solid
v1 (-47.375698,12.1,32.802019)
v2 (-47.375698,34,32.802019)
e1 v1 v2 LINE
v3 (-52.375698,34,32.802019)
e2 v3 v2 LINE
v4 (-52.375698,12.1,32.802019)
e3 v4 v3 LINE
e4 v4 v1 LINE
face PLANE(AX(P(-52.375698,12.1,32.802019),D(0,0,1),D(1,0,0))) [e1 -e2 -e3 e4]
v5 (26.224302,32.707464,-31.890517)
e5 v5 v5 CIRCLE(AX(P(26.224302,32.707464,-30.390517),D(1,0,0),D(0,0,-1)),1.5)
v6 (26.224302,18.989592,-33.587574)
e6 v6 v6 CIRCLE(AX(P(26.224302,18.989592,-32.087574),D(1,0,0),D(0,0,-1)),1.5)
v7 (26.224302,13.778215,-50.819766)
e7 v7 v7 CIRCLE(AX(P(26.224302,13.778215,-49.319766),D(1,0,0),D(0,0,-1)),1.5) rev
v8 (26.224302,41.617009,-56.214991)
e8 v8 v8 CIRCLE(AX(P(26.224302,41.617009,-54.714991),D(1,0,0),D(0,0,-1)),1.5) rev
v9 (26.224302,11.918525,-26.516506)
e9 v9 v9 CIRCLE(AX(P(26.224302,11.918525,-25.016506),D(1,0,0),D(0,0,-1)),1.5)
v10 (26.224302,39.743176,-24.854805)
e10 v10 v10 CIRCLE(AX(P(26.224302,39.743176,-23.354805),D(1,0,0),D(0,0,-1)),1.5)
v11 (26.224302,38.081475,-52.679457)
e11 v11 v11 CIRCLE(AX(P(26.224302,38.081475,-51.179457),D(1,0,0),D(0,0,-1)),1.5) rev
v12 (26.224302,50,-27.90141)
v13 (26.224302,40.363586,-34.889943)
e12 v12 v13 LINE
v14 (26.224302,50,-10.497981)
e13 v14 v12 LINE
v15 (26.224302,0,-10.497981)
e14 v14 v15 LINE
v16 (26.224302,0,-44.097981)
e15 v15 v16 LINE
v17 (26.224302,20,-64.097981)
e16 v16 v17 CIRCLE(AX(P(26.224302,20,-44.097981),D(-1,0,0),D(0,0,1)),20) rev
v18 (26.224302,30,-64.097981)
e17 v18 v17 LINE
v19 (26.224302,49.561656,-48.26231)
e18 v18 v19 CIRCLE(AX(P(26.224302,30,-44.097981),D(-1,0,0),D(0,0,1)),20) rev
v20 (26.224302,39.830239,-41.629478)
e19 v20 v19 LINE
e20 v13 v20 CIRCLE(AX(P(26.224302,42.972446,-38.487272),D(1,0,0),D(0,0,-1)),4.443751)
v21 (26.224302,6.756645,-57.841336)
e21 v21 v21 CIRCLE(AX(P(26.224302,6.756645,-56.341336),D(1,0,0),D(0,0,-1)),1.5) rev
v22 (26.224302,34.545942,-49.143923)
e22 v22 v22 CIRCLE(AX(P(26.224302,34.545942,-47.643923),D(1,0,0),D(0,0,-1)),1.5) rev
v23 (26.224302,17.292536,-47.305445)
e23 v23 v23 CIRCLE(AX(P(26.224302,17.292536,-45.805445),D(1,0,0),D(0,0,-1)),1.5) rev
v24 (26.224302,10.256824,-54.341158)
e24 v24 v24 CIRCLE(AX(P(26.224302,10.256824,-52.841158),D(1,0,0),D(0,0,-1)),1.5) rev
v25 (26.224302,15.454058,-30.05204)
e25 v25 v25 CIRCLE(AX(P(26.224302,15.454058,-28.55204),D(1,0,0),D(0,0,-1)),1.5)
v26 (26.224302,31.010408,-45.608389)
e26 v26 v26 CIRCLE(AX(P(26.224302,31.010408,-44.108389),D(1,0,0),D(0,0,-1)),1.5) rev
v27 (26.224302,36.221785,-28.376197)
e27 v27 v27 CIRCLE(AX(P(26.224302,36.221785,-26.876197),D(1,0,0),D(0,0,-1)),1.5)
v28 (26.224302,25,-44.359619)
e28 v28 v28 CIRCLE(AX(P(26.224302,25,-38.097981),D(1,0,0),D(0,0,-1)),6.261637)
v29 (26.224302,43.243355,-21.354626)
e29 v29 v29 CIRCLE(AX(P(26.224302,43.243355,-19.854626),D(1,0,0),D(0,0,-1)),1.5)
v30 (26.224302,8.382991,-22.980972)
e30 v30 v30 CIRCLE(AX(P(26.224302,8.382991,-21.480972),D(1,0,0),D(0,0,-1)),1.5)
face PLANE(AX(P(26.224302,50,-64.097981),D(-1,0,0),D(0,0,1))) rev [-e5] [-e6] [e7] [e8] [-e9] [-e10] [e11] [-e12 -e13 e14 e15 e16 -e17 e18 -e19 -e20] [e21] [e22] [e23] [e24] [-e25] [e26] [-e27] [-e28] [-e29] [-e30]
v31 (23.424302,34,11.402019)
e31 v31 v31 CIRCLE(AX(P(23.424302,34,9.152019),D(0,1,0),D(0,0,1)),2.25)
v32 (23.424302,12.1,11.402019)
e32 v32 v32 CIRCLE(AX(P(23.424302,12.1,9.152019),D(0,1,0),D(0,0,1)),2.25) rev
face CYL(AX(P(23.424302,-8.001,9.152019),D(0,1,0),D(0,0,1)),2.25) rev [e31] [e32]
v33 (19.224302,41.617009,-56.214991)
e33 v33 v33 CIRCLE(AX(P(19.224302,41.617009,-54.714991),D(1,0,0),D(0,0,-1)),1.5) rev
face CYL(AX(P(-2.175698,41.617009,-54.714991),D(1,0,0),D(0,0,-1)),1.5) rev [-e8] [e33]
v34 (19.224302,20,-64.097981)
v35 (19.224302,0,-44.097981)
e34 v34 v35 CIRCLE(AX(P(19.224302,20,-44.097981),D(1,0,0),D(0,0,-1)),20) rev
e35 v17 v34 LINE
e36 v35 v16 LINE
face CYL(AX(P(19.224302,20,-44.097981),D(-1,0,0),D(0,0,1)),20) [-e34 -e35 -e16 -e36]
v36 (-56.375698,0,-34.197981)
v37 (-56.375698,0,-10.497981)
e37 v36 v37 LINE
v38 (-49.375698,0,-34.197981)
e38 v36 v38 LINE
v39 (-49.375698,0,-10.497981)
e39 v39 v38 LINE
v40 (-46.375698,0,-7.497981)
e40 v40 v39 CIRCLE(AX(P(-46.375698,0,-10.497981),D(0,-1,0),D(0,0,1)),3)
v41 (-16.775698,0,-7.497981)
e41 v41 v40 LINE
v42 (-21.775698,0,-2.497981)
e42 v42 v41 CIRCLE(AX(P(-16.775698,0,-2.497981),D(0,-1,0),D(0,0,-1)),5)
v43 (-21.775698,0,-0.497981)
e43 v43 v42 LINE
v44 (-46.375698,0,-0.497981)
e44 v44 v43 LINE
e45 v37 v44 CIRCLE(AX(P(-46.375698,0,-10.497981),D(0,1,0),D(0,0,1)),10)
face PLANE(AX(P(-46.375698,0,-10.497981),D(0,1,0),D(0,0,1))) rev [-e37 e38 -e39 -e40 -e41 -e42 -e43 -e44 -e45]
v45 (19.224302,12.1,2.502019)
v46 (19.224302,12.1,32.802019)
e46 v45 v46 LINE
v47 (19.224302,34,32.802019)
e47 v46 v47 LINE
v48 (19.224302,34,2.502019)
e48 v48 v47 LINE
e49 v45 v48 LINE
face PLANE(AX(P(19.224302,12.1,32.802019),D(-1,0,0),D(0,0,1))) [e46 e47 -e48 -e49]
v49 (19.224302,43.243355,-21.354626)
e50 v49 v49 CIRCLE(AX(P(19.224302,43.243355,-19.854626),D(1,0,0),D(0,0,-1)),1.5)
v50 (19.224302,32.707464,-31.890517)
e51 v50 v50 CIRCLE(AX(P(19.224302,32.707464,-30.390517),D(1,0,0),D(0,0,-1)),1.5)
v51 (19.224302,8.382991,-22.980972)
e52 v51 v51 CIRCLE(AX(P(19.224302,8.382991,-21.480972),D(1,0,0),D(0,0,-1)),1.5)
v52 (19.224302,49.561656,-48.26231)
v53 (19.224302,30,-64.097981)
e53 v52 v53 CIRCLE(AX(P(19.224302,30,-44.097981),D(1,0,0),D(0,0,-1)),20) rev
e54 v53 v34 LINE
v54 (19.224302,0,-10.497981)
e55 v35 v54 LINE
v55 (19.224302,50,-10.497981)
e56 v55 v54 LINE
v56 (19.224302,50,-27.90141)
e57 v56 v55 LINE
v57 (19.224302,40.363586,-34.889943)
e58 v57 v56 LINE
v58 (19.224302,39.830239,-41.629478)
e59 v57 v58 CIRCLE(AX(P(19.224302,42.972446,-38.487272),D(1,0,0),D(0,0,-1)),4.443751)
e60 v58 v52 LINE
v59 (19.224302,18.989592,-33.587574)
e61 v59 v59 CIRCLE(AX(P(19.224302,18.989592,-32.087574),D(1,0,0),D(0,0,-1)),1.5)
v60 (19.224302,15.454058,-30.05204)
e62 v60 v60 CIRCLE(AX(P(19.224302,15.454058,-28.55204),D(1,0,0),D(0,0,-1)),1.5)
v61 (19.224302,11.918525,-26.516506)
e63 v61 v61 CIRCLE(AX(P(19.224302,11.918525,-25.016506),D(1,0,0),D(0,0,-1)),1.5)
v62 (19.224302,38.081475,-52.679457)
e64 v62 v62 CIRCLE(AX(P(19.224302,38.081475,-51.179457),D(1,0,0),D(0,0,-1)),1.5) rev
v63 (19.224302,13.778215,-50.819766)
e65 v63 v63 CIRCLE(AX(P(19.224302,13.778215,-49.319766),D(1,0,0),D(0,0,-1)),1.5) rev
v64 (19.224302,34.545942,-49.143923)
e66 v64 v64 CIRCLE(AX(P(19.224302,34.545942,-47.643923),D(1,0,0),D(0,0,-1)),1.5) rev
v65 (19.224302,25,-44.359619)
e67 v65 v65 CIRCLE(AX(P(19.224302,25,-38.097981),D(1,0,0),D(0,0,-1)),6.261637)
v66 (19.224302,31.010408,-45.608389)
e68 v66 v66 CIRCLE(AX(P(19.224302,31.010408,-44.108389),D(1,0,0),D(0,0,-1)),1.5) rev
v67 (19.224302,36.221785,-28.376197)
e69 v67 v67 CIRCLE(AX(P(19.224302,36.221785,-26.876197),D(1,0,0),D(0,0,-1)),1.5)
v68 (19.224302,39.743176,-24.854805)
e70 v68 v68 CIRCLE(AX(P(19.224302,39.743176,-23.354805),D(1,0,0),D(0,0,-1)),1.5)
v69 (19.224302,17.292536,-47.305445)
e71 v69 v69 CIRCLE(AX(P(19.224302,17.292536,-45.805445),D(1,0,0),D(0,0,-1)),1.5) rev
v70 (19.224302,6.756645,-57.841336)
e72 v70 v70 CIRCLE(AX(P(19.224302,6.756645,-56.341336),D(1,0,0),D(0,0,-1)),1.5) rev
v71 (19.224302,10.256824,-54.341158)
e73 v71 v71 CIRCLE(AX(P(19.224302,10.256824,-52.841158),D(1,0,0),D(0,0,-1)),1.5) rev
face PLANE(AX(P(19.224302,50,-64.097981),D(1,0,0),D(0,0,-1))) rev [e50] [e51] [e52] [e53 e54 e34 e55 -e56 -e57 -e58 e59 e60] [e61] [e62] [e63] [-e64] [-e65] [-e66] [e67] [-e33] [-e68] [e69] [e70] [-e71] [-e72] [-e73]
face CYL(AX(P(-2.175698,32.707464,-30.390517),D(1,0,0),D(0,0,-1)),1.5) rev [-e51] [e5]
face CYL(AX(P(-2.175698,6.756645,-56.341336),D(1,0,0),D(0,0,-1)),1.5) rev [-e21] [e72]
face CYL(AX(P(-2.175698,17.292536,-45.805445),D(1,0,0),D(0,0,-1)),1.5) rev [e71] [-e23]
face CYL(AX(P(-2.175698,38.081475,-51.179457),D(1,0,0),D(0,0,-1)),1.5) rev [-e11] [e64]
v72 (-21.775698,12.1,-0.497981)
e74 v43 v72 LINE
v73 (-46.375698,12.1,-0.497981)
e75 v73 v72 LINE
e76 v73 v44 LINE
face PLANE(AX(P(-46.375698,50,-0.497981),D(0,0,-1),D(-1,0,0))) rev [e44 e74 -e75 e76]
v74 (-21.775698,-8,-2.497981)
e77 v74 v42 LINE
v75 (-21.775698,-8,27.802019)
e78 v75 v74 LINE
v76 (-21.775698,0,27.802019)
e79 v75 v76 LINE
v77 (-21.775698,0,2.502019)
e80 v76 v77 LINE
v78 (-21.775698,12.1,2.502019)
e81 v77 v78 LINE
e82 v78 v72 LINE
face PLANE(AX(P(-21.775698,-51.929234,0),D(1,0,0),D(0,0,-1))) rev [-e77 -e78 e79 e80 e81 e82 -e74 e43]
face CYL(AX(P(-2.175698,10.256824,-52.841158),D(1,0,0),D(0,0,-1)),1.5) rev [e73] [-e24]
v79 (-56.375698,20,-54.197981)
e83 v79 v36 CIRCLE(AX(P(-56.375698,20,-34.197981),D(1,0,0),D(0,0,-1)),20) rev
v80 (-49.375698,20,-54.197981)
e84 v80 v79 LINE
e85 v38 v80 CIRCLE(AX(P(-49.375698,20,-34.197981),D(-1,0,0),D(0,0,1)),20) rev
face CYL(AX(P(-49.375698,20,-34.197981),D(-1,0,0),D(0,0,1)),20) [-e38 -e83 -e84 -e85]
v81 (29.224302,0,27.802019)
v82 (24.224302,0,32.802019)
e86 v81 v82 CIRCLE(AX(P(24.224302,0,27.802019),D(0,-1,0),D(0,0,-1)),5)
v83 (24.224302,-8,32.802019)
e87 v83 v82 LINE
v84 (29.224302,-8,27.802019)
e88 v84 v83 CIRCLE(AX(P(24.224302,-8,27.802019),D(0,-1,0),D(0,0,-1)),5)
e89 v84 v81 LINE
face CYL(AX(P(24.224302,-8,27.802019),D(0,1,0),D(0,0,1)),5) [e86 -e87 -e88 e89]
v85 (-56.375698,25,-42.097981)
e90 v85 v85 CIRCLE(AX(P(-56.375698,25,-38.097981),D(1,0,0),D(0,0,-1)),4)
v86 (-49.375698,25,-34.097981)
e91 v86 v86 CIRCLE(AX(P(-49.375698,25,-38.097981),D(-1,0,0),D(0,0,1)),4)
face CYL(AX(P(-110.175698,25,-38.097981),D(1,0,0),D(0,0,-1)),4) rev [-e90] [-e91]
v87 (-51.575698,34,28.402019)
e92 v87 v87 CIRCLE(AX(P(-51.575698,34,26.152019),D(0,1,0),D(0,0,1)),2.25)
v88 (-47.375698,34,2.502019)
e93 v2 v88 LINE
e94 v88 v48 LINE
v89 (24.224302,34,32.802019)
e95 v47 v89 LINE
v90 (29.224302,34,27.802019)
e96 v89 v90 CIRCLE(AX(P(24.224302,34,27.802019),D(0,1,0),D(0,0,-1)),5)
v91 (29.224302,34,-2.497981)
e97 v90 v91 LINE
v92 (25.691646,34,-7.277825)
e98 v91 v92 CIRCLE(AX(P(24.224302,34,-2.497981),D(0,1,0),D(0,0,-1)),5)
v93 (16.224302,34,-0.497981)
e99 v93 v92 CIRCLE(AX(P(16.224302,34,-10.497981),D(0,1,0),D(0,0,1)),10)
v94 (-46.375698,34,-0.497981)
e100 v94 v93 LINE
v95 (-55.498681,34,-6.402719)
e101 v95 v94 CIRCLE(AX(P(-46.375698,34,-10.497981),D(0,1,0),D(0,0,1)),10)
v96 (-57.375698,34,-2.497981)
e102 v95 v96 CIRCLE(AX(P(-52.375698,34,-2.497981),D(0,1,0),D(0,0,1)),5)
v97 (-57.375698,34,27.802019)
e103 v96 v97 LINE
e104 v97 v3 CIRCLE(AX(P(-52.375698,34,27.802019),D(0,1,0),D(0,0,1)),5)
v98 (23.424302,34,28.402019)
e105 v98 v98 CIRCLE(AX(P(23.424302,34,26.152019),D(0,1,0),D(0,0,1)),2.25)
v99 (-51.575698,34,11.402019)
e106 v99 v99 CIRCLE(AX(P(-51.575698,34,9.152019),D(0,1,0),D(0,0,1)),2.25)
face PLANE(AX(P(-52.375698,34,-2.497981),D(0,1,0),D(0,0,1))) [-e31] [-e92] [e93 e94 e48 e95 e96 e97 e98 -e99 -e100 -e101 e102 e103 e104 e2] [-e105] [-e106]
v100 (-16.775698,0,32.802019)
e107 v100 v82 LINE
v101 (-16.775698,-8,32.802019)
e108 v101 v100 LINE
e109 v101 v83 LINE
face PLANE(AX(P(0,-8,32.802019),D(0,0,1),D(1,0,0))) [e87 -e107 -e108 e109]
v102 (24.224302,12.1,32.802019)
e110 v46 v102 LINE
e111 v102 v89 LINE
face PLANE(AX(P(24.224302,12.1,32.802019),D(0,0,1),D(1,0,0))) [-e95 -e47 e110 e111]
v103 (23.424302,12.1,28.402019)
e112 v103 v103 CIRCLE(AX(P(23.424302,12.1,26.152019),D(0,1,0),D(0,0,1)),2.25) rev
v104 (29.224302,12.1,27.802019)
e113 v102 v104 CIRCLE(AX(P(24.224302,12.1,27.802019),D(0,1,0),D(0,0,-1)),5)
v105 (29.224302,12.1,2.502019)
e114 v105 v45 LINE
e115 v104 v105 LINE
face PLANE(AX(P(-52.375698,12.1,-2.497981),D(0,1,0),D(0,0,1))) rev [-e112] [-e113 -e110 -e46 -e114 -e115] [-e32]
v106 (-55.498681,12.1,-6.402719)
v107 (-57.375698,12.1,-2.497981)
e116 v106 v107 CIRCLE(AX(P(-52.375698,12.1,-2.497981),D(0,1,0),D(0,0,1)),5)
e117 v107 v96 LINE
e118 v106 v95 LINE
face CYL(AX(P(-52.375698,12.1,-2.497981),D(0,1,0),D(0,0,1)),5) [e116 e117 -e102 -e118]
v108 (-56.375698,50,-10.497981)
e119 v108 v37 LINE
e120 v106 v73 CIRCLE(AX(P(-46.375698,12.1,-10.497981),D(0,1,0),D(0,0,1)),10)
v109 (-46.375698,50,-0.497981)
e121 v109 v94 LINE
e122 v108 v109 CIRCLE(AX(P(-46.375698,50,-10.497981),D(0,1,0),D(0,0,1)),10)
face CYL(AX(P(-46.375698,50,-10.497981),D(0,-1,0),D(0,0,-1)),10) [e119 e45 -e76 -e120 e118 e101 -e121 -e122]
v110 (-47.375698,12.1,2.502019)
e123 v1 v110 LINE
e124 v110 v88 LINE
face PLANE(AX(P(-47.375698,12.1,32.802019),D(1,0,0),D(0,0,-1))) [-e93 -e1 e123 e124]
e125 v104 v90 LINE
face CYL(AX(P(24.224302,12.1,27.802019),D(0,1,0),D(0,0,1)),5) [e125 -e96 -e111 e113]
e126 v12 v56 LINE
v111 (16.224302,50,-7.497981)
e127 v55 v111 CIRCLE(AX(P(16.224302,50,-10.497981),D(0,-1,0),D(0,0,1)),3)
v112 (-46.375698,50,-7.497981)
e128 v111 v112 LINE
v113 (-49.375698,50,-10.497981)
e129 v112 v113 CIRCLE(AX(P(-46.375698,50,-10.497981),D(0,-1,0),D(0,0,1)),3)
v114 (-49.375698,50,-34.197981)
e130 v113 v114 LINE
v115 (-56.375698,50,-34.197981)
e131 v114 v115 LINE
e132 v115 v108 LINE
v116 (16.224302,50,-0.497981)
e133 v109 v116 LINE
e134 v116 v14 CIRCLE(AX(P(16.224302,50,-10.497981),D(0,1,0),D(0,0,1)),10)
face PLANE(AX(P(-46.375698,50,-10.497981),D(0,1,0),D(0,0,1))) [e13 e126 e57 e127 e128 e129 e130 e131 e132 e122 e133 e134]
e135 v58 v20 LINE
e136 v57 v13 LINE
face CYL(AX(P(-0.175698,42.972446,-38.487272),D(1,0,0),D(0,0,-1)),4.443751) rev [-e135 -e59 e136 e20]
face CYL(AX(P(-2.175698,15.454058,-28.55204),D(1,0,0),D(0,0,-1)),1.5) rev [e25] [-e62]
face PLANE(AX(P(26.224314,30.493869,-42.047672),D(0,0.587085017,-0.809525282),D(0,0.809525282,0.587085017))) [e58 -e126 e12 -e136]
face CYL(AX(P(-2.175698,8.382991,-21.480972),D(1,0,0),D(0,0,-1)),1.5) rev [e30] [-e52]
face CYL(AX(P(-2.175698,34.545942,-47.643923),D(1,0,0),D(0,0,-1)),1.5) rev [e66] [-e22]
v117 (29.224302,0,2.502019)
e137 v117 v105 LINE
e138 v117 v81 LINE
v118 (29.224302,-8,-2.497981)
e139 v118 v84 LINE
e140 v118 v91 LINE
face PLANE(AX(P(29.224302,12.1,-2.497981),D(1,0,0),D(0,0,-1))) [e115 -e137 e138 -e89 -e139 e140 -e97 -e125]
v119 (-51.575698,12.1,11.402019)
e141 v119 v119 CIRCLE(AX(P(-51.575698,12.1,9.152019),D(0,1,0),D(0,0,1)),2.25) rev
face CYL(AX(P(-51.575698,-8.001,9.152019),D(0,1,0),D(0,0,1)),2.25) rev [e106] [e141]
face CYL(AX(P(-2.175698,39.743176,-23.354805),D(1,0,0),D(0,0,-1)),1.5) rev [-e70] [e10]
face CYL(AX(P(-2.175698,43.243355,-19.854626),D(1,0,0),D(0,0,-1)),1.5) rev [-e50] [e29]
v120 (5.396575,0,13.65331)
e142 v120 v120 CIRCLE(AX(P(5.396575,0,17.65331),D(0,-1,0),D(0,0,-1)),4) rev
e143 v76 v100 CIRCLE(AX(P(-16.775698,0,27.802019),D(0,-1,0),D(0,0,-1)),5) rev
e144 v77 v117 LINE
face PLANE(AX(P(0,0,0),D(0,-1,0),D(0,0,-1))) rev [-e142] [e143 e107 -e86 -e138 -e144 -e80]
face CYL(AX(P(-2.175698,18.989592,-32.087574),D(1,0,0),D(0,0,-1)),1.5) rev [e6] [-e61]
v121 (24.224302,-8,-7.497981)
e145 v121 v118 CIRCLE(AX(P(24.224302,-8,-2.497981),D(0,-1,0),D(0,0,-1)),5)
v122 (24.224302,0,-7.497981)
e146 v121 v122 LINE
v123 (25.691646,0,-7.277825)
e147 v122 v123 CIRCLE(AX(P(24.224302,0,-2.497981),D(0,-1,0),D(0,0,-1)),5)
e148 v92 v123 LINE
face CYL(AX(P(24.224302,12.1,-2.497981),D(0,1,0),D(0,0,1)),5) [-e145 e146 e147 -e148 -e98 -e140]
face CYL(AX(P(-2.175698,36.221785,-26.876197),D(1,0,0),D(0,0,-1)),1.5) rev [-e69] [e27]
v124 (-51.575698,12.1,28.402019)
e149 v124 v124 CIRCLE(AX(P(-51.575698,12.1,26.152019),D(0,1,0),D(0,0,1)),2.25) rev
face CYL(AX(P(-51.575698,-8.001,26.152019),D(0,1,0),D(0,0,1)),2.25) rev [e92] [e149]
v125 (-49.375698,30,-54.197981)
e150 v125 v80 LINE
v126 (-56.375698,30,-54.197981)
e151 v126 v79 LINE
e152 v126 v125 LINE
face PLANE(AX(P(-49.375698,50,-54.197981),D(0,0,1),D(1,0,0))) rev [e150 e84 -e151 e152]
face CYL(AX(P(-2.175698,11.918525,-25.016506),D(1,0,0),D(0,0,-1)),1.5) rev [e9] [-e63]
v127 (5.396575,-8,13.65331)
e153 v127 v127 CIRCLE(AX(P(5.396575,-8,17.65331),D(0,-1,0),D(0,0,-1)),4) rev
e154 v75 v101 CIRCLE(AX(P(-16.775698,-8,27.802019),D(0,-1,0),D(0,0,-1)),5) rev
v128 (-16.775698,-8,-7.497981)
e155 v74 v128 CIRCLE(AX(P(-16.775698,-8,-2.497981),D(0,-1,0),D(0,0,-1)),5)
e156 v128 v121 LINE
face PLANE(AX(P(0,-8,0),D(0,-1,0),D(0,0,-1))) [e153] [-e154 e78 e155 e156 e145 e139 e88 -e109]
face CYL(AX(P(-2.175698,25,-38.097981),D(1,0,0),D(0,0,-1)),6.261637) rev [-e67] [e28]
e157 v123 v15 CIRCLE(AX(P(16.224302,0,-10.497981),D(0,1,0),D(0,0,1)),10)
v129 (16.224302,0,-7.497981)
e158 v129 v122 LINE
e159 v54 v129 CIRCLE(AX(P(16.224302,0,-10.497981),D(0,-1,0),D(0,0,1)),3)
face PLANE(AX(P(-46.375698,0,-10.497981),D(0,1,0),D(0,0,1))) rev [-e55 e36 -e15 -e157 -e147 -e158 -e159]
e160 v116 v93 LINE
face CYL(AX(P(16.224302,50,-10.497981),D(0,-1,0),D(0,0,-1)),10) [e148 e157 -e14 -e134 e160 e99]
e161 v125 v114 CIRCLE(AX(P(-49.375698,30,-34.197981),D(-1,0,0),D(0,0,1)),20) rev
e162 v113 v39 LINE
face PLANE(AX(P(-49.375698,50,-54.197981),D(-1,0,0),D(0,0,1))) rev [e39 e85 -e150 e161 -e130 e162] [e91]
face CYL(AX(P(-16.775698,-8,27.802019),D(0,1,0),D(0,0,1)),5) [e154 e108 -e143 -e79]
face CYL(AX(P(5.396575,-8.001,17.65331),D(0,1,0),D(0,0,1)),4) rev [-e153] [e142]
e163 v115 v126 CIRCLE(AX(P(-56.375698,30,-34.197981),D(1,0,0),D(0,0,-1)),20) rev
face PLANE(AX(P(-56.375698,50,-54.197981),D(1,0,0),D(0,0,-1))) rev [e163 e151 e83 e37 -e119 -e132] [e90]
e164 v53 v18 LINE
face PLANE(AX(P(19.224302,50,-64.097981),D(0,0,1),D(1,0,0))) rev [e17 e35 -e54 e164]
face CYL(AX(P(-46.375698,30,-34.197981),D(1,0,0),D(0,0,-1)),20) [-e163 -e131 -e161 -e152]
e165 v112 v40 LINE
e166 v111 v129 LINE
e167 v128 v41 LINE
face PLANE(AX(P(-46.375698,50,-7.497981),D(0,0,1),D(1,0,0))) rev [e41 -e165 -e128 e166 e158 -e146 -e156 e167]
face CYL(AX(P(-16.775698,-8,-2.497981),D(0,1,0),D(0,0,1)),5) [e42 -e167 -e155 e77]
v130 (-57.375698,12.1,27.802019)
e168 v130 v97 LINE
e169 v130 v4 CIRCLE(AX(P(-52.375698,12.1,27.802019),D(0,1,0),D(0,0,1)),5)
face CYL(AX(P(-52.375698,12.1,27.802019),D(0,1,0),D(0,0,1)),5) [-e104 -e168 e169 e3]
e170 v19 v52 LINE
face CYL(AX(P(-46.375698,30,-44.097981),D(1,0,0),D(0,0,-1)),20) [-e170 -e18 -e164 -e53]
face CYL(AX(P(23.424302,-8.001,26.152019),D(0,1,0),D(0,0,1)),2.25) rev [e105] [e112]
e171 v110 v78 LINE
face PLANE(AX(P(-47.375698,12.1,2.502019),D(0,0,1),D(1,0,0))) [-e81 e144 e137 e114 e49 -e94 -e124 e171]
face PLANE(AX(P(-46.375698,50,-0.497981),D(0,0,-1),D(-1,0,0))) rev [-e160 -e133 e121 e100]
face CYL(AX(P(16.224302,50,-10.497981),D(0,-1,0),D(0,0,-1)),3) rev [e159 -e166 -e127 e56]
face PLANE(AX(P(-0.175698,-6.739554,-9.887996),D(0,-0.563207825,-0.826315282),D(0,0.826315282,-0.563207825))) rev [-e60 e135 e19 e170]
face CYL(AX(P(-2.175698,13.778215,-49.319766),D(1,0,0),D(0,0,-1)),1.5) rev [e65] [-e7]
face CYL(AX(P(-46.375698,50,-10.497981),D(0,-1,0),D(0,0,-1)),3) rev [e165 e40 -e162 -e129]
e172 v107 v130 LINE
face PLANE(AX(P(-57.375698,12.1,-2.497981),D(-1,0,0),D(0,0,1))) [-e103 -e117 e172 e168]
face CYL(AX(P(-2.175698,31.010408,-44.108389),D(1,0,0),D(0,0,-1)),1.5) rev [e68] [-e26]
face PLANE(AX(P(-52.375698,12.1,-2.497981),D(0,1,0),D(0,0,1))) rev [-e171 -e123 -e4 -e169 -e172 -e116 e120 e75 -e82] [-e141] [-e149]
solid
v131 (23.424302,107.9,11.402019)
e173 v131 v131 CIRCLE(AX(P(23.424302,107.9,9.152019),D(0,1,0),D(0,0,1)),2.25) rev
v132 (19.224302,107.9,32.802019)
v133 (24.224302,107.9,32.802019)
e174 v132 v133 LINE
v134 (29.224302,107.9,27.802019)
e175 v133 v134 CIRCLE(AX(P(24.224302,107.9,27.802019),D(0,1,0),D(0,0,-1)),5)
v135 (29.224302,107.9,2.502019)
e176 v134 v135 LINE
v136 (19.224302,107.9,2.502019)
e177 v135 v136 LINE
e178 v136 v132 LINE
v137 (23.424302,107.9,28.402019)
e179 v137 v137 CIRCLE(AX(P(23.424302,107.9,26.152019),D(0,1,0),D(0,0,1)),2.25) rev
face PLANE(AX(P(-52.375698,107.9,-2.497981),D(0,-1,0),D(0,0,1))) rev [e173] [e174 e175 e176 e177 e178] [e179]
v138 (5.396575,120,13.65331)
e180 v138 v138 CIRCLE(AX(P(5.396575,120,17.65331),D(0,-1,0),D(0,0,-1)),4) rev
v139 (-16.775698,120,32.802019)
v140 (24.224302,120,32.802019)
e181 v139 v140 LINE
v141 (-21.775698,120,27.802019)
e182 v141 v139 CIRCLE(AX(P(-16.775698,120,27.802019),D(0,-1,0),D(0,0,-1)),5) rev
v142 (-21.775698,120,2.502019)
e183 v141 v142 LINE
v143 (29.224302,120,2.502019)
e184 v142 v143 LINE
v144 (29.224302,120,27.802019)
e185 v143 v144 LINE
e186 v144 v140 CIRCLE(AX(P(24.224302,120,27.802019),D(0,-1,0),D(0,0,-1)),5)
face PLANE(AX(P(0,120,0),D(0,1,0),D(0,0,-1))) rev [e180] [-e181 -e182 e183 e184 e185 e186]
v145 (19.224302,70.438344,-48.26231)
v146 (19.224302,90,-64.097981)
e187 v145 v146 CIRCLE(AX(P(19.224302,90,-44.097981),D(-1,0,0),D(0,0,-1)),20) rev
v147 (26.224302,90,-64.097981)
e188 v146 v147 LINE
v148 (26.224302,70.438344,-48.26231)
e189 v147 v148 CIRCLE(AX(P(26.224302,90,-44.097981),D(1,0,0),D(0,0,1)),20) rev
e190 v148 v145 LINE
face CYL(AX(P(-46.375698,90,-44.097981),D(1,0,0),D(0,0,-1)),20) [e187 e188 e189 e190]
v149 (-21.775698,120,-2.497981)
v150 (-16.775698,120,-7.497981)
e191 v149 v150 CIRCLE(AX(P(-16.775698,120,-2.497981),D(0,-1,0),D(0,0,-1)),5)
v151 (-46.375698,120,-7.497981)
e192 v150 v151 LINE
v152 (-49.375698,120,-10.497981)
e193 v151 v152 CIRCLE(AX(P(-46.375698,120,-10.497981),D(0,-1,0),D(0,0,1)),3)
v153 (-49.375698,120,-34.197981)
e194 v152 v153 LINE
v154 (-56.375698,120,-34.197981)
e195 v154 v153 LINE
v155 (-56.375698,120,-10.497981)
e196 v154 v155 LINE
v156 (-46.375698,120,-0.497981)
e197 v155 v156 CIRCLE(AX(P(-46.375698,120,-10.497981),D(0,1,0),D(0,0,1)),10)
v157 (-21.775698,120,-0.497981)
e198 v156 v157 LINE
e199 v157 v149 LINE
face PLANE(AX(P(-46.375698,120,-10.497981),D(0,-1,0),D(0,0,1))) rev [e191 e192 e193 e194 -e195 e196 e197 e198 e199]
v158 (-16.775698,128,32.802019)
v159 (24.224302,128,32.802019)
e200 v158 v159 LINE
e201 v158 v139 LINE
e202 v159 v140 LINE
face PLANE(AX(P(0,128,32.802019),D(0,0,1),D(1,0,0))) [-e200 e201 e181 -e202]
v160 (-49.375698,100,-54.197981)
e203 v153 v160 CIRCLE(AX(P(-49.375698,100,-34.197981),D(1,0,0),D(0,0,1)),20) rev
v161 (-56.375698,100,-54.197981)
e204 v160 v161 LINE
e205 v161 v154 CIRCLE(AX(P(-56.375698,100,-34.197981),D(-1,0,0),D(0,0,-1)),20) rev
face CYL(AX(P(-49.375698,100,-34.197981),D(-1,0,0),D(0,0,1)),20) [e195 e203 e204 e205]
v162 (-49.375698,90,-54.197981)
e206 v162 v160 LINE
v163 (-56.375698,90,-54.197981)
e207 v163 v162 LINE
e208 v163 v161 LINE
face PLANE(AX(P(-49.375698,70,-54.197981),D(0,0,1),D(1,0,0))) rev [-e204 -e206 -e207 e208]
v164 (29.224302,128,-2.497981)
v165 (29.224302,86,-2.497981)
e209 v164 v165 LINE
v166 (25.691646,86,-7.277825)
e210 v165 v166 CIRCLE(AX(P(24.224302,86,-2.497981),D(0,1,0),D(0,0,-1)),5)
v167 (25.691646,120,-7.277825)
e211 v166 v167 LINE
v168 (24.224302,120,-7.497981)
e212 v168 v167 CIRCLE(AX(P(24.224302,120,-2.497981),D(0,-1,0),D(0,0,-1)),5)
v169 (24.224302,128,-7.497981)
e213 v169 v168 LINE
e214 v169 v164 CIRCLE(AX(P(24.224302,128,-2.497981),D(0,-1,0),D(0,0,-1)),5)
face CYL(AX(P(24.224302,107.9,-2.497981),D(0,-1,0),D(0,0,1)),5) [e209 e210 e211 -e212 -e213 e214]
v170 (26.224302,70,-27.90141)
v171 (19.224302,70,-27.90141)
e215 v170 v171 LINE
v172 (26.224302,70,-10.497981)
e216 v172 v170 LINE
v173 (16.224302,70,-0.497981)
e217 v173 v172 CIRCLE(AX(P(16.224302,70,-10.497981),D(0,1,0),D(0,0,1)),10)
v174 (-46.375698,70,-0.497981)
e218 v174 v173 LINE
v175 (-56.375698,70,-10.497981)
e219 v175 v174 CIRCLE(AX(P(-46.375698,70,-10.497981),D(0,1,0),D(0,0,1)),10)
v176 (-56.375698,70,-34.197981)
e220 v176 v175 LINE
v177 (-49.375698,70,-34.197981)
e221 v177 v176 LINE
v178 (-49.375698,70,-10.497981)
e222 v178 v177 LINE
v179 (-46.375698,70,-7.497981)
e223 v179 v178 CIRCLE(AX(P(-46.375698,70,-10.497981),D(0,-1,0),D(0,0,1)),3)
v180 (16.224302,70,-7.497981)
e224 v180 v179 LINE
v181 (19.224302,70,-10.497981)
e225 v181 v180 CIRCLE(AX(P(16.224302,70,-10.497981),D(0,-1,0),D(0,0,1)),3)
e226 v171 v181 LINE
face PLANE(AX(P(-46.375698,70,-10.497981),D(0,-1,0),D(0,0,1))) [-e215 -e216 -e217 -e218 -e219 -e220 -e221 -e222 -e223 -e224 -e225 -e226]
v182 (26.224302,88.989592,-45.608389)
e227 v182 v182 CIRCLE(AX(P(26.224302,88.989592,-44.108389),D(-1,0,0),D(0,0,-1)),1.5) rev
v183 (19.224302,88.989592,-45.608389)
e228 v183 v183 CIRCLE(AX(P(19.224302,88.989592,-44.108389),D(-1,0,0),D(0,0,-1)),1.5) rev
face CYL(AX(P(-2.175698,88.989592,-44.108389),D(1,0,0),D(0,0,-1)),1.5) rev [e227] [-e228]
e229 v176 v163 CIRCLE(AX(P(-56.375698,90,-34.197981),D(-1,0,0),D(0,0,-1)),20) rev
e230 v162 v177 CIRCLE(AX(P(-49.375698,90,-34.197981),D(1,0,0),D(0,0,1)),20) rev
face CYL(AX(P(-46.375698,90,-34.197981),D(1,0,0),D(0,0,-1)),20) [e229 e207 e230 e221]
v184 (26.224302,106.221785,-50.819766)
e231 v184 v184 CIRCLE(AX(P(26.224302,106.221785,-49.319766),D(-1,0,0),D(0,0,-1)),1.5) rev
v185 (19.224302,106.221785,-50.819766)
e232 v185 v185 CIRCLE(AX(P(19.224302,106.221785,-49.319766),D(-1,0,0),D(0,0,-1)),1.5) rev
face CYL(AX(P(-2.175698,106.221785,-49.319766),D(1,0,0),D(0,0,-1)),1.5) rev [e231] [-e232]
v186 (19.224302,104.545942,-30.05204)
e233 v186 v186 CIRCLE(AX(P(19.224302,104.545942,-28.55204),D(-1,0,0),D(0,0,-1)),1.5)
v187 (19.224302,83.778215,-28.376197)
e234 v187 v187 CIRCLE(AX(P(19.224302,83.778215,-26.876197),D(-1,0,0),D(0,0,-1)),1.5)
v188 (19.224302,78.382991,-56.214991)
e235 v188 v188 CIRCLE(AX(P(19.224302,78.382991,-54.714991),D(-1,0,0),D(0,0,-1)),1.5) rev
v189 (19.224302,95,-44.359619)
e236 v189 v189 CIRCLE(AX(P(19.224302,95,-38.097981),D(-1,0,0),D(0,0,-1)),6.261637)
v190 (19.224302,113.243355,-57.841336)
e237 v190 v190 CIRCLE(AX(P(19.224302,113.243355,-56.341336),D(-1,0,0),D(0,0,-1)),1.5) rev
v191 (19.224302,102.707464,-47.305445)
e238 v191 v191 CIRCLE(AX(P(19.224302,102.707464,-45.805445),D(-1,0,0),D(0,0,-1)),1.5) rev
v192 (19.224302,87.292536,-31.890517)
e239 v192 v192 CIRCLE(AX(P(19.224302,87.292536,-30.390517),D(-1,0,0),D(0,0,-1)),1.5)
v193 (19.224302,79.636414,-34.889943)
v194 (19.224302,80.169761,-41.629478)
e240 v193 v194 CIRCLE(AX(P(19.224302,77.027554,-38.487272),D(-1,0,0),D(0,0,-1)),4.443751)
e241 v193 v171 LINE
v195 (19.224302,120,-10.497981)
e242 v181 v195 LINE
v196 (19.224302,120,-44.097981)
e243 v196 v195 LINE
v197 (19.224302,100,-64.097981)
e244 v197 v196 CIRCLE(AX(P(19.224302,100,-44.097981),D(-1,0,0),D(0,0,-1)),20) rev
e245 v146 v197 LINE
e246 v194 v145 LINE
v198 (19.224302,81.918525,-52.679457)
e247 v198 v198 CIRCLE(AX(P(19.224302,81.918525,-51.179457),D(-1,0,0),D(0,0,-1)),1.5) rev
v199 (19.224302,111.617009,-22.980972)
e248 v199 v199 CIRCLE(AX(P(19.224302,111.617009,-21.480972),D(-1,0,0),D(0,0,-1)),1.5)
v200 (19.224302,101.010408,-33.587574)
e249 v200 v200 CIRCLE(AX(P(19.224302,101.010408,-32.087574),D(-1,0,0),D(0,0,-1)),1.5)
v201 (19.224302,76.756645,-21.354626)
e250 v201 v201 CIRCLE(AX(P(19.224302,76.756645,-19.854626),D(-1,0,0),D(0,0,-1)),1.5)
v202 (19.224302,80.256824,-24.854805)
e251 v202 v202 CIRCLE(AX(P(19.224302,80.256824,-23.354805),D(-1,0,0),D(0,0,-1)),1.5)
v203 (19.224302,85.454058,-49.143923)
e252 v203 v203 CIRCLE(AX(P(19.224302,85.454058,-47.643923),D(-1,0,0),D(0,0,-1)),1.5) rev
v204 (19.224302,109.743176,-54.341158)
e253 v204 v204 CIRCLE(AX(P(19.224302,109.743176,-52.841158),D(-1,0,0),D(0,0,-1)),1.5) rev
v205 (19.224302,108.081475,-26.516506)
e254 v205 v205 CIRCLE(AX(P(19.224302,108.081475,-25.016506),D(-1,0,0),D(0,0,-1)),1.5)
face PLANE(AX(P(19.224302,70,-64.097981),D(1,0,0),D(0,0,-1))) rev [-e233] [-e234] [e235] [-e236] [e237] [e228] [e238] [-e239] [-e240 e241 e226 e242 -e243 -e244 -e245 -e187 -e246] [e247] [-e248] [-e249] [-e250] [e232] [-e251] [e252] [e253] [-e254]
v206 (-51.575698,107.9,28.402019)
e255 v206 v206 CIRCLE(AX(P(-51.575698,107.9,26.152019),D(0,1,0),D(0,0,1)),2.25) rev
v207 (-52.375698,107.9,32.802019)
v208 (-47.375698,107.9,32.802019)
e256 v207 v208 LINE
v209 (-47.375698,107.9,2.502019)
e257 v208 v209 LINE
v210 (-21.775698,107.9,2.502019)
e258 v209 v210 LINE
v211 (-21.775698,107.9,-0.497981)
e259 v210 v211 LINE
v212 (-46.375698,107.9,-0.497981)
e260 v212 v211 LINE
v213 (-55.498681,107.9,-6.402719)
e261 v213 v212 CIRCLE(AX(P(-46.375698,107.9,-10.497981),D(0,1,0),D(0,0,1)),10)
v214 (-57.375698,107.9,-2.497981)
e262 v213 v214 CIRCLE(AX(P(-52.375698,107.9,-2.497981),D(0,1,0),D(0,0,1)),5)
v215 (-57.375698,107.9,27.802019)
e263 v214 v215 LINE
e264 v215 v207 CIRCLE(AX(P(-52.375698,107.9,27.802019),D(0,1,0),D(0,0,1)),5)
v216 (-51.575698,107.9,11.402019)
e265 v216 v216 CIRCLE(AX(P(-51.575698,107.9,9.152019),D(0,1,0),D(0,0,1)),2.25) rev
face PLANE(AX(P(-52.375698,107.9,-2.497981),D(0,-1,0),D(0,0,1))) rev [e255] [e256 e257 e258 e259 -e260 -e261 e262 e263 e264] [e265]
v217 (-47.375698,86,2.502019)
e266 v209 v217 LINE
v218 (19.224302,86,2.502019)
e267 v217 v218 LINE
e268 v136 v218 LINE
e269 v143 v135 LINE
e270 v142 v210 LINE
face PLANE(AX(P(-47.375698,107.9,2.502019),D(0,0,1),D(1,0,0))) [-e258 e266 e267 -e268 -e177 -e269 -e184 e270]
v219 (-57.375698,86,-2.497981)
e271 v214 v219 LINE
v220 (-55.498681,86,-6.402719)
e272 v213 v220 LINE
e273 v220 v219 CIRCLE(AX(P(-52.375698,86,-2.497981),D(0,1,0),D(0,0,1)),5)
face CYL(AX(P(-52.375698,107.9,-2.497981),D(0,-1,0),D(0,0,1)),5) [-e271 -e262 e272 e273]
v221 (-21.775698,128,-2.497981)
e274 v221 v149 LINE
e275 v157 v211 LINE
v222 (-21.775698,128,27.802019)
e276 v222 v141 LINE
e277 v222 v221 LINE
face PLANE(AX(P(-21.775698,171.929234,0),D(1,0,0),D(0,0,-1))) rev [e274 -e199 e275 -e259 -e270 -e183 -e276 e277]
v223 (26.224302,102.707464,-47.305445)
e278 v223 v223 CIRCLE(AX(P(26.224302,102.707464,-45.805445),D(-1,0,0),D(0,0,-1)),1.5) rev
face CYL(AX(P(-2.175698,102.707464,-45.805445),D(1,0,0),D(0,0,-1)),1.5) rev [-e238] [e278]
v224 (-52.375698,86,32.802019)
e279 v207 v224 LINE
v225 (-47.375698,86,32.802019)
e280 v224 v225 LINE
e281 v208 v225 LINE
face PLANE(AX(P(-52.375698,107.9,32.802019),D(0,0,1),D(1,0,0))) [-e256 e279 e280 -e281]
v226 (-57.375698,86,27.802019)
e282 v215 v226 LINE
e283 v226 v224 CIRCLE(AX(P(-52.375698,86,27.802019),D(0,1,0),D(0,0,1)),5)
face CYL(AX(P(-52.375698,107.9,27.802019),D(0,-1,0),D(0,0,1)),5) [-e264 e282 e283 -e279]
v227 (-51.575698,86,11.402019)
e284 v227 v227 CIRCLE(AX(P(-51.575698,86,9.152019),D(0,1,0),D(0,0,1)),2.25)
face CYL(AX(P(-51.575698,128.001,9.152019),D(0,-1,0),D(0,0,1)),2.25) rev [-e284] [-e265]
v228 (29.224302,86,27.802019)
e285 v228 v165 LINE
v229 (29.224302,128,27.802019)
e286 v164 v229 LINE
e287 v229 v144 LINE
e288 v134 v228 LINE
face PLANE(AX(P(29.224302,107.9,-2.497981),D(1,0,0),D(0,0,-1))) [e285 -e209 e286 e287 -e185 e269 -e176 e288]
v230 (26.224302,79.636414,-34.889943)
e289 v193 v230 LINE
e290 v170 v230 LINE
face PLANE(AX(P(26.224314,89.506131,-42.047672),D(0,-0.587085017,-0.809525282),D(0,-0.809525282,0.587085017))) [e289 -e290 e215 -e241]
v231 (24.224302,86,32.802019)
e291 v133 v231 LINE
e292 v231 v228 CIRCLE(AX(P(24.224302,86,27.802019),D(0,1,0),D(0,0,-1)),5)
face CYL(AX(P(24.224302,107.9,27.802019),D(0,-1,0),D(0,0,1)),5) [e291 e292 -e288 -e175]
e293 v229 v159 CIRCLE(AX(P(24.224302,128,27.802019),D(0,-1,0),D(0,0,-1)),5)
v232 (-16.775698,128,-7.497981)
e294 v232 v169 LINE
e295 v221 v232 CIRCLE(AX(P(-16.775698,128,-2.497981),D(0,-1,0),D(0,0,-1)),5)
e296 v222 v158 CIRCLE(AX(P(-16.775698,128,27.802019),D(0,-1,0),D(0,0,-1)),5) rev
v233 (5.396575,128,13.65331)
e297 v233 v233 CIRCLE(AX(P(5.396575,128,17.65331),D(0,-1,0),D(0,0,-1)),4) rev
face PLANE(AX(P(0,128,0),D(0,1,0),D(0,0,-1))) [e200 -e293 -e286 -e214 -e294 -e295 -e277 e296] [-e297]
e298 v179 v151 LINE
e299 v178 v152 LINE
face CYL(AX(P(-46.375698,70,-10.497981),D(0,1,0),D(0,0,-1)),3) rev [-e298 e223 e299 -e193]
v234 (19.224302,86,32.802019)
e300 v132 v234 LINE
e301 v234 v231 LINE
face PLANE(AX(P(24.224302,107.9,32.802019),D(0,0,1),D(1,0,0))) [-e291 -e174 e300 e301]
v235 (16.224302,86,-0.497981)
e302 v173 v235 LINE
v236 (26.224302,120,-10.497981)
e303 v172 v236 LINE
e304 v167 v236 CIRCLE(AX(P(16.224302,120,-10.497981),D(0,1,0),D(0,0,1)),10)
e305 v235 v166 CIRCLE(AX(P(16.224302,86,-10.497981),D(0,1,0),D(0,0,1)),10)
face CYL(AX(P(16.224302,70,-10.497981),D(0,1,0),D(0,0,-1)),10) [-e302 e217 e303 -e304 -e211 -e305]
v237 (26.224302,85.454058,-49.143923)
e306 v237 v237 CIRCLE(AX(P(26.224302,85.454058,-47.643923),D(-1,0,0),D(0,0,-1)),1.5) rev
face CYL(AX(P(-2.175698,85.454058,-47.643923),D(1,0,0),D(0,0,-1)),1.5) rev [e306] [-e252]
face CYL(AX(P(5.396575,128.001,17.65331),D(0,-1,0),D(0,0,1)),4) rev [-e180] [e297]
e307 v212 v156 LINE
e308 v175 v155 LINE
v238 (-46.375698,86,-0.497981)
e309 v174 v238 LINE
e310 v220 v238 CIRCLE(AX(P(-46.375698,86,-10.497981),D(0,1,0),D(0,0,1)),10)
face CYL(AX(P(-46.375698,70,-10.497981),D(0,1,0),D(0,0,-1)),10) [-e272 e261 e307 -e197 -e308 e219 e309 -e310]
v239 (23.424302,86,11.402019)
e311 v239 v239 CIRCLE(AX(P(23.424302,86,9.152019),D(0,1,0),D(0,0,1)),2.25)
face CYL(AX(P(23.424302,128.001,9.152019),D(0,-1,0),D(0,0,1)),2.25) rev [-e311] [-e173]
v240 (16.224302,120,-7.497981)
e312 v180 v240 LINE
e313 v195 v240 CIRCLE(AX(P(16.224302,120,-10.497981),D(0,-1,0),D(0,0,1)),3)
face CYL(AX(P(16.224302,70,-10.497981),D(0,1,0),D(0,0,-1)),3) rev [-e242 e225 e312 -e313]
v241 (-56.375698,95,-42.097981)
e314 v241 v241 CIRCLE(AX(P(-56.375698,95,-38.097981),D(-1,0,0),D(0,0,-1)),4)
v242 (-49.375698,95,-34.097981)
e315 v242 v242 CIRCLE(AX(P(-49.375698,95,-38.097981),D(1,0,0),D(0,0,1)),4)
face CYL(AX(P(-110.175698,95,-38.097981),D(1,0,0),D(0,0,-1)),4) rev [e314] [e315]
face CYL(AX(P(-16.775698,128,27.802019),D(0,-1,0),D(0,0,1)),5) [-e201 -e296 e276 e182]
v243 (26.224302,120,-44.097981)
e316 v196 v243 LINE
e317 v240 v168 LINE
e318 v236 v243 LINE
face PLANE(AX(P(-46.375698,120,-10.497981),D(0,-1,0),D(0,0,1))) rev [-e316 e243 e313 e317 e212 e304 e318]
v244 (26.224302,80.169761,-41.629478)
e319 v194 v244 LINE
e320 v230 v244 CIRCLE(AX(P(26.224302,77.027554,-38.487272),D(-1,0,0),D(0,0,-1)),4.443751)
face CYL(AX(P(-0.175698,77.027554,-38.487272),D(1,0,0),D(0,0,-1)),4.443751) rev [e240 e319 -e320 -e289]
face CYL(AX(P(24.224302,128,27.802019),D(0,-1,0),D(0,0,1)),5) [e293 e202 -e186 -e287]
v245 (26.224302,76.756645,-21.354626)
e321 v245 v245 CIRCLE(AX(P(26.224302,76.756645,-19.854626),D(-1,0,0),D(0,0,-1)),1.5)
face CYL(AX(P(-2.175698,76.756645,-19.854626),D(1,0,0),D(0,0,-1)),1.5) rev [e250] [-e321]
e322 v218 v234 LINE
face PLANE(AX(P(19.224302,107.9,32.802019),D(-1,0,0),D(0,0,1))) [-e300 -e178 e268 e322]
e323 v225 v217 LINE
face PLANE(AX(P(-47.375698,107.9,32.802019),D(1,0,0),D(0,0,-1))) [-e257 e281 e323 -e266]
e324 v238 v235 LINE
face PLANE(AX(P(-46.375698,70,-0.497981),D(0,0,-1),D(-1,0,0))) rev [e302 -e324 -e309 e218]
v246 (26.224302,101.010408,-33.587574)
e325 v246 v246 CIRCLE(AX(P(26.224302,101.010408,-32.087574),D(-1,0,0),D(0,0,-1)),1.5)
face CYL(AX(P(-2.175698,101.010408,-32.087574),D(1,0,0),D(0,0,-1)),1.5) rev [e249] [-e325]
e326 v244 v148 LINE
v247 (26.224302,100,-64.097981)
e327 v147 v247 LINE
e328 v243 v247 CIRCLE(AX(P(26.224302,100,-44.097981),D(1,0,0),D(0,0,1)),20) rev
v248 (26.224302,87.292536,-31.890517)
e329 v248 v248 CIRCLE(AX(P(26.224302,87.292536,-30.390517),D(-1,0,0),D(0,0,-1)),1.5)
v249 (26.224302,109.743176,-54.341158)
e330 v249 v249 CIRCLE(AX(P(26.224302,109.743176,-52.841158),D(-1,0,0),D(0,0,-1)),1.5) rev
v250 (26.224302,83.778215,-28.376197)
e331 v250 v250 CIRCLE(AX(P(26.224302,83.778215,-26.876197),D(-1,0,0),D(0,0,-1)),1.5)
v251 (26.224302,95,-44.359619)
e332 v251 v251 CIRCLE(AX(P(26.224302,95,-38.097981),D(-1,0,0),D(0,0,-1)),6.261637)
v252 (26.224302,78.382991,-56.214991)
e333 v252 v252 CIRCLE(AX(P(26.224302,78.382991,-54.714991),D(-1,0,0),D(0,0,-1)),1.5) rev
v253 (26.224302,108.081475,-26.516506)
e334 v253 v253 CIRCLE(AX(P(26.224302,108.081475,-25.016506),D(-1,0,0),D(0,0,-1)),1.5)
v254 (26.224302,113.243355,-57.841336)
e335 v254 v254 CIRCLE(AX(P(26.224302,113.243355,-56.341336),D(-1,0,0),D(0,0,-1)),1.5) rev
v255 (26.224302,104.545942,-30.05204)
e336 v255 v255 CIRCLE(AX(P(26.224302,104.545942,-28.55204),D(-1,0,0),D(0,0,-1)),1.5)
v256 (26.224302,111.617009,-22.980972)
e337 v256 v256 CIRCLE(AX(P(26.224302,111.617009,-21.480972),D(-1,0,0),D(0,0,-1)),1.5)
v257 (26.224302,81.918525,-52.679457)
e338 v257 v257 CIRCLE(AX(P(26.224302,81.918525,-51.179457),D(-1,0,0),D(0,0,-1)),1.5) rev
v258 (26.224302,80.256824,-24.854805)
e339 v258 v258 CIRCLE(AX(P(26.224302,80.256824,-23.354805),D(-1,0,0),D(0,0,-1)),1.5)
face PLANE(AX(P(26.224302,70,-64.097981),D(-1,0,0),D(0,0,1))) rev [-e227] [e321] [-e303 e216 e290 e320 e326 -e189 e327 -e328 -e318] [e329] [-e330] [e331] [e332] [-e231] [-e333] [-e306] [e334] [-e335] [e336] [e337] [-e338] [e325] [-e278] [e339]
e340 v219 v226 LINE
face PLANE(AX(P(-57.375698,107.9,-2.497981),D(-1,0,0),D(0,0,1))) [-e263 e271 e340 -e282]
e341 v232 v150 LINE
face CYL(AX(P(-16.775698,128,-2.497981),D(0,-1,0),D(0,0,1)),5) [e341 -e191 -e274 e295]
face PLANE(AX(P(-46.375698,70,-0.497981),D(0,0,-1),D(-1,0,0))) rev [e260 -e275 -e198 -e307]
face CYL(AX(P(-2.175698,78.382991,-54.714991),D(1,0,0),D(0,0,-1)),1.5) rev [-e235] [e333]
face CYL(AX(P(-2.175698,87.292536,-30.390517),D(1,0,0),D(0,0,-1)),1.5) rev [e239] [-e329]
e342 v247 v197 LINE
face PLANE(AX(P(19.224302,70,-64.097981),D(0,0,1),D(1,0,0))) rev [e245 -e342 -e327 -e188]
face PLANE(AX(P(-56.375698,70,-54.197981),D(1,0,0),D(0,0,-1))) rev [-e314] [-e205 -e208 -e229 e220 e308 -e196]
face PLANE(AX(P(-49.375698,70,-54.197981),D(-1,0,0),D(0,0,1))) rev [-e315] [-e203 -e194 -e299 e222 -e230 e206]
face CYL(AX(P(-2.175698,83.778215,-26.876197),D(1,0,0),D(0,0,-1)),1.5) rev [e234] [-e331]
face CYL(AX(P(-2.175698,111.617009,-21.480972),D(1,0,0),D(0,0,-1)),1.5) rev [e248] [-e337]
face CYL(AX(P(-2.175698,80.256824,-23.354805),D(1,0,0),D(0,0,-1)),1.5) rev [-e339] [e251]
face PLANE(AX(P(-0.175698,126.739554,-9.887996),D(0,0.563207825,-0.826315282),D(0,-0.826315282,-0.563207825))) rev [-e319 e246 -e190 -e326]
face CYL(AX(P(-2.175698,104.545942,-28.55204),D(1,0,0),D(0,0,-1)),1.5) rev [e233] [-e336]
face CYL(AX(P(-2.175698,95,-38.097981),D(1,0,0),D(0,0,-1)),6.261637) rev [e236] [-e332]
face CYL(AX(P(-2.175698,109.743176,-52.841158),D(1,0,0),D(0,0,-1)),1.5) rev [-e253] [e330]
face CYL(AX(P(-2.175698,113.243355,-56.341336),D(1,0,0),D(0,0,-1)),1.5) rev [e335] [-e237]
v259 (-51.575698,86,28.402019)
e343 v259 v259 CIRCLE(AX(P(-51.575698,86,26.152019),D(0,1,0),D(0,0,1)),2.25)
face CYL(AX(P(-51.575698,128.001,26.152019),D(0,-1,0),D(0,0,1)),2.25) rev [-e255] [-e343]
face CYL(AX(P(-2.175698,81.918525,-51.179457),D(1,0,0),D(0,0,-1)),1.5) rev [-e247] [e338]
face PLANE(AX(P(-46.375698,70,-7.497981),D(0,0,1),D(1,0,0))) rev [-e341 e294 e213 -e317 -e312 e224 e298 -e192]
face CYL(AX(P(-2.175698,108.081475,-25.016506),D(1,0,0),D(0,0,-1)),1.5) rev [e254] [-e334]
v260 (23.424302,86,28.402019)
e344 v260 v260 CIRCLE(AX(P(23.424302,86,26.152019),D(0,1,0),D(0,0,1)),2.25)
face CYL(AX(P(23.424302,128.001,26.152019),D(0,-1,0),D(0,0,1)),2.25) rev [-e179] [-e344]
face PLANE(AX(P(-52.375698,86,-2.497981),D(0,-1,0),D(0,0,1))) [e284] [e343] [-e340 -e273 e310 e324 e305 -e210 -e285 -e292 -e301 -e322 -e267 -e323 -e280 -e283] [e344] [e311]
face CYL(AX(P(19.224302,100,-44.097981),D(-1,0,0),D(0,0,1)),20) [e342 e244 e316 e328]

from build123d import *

# Parameters (mm, degrees)
BOSS_EXTRUDE1_DEPTH      = 50
FILLET2_R                = 20
SKETCH6_R                = 1.5
CUT_EXTRUDE2_DEPTH       = 28.4
CUT_EXTRUDE3_DEPTH       = 136.4
CUT_EXTRUDE4_DEPTH       = 116.893533958
CUT_EXTRUDE4_DEPTH_BACK  = 26.4
BOSS_EXTRUDE2_DEPTH      = 21.9
BOSS_EXTRUDE3_DEPTH      = 12.1
BOSS_EXTRUDE4_DEPTH      = 8
CUT_EXTRUDE5_START       = 12.1
CUT_EXTRUDE5_OUTLINE_R   = 2.25
CUT_EXTRUDE5_DEPTH       = 21.9
CUT_EXTRUDE5_START_2     = -8
CUT_EXTRUDE5_2_OUTLINE_R = 4
CUT_EXTRUDE5_2_DEPTH     = 8


# Read off the part's stored shape, not the designer's step: Cut-Extrude5
with BuildPart() as part:
    # Sketch1 → Boss-Extrude1 (new body)
    with BuildSketch(Plane(origin=(0, 0, 0), x_dir=(1, 0, 0), z_dir=(0, 1, 0))):
        with BuildLine():
            Line((-56.375697839, 54.197981352), (-56.375697839, 10.497981352))
            ThreePointArc((-56.375697839, 10.497981352), (-53.44676565, 3.42691354), (-46.375697839, 0.497981352))
            Line((-46.375697839, 0.497981352), (16.224302161, 0.497981352))
            ThreePointArc((16.224302161, 0.497981352), (23.295369973, 3.42691354), (26.224302161, 10.497981352))
            Line((26.224302161, 10.497981352), (26.224302161, 64.097981352))
            Line((26.224302161, 64.097981352), (19.224302161, 64.097981352))
            Line((19.224302161, 64.097981352), (19.224302161, 10.497981352))
            ThreePointArc((19.224302161, 10.497981352), (18.345622505, 8.376661008), (16.224302161, 7.497981352))
            Line((16.224302161, 7.497981352), (-46.375697839, 7.497981352))
            ThreePointArc((-46.375697839, 7.497981352), (-48.497018182, 8.376661008), (-49.375697839, 10.497981352))
            Line((-49.375697839, 10.497981352), (-49.375697839, 54.197981352))
            Line((-49.375697839, 54.197981352), (-56.375697839, 54.197981352))
        make_face()
    extrude(amount=BOSS_EXTRUDE1_DEPTH)

    # Fillet2
    fillet2_edges = [part.edges().sort_by_distance(p)[0] for p in [
        (22.724302161, 0, -64.097981352),
        (-52.875697839, 0, -54.197981352),
        (22.724302161, 50, -64.097981352),
        (-52.875697839, 50, -54.197981352),
    ]]
    fillet(fillet2_edges, radius=FILLET2_R)

    # Sketch6 → Cut-Extrude2 (cut)
    with BuildSketch(Plane(origin=(26.224302161, 0, 0), x_dir=(0, 0, -1), z_dir=(1, 0, 0))):
        with BuildLine():
            ThreePointArc((34.097981352, 25), (38.097981352, 21), (42.097981352, 25))
            Line((42.097981352, 25), (34.097981352, 25))
        make_face()
        with BuildLine():
            Line((34.097981352, 25), (42.097981352, 25))
            ThreePointArc((42.097981352, 25), (38.097981352, 29), (34.097981352, 25))
        make_face()
        with BuildLine():
            ThreePointArc((31.836343923, 25), (38.097981352, 18.738362572), (44.35961878, 25))
            Line((44.35961878, 25), (42.097981352, 25))
            ThreePointArc((42.097981352, 25), (38.097981352, 21), (34.097981352, 25))
            Line((34.097981352, 25), (31.836343923, 25))
        make_face()
        with BuildLine():
            Line((42.097981352, 25), (44.35961878, 25))
            ThreePointArc((44.35961878, 25), (38.097981352, 31.261637428), (31.836343923, 25))
            Line((31.836343923, 25), (34.097981352, 25))
            ThreePointArc((34.097981352, 25), (38.097981352, 29), (42.097981352, 25))
        make_face()
        with Locations((30.390517437, 32.707463915)):
            Circle(SKETCH6_R)
        with Locations((26.876196734, 36.221784617)):
            Circle(SKETCH6_R)
        with Locations((23.354804964, 39.743176388)):
            Circle(SKETCH6_R)
        with Locations((19.854626397, 43.243354955)):
            Circle(SKETCH6_R)
        with Locations((44.108388992, 31.01040764)):
            Circle(SKETCH6_R)
        with Locations((47.643922898, 34.545941546)):
            Circle(SKETCH6_R)
        with Locations((51.179456803, 38.081475452)):
            Circle(SKETCH6_R)
        with Locations((54.714990709, 41.617009358)):
            Circle(SKETCH6_R)
        with Locations((45.805445266, 17.292536085)):
            Circle(SKETCH6_R)
        with Locations((49.319765969, 13.778215383)):
            Circle(SKETCH6_R)
        with Locations((52.841157739, 10.256823612)):
            Circle(SKETCH6_R)
        with Locations((56.341336306, 6.756645045)):
            Circle(SKETCH6_R)
        with Locations((32.087573711, 18.98959236)):
            Circle(SKETCH6_R)
        with Locations((28.552039805, 15.454058454)):
            Circle(SKETCH6_R)
        with Locations((25.0165059, 11.918524548)):
            Circle(SKETCH6_R)
        with Locations((21.480971994, 8.382990642)):
            Circle(SKETCH6_R)
    extrude(amount=-CUT_EXTRUDE2_DEPTH, mode=Mode.SUBTRACT)

    # Sketch6<3> → Cut-Extrude3 (cut)
    with BuildSketch(Plane(origin=(26.224302161, 0, 0), x_dir=(0, 0, -1), z_dir=(1, 0, 0))):
        with BuildLine():
            ThreePointArc((34.097981352, 25), (38.097981352, 21), (42.097981352, 25))
            Line((42.097981352, 25), (34.097981352, 25))
        make_face()
        with BuildLine():
            Line((34.097981352, 25), (42.097981352, 25))
            ThreePointArc((42.097981352, 25), (38.097981352, 29), (34.097981352, 25))
        make_face()
    extrude(amount=-CUT_EXTRUDE3_DEPTH, mode=Mode.SUBTRACT)

    # Sketch7 → Cut-Extrude4 (cut, two sides: drawn at the far end of the back side and taken through both)
    with BuildSketch(Plane(origin=(26.224302161, 0, 0), x_dir=(0, 0, -1), z_dir=(1, 0, 0)).offset(-CUT_EXTRUDE4_DEPTH_BACK)):
        with BuildLine():
            Line((44.097981352, 50), (27.901409821, 50))
            Line((27.901409821, 50), (34.889942889, 40.363586132))
            ThreePointArc((34.889942889, 40.363586132), (38.136702541, 38.542544558), (41.629478365, 39.830239282))
            Line((41.629478365, 39.830239282), (48.26230961, 49.561655609))
            ThreePointArc((48.26230961, 49.561655609), (46.191648926, 49.890112018), (44.097981352, 50))
        make_face()
    extrude(amount=CUT_EXTRUDE4_DEPTH + CUT_EXTRUDE4_DEPTH_BACK, mode=Mode.SUBTRACT)

    # Sketch8 → Boss-Extrude2 (add)
    with BuildSketch(Plane(origin=(0, 34, 0), x_dir=(1, 0, 0), z_dir=(0, 1, 0))):
        with BuildLine():
            Line((-52.375697839, 7.497981352), (24.224302161, 7.497981352))
            ThreePointArc((24.224302161, 7.497981352), (27.759836067, 6.033515257), (29.224302161, 2.497981352))
            Line((29.224302161, 2.497981352), (29.224302161, -27.802018648))
            ThreePointArc((29.224302161, -27.802018648), (27.759836067, -31.337552554), (24.224302161, -32.802018648))
            Line((24.224302161, -32.802018648), (19.224302161, -32.802018648))
            Line((19.224302161, -32.802018648), (19.224302161, -2.502018648))
            Line((19.224302161, -2.502018648), (-47.375697839, -2.502018648))
            Line((-47.375697839, -2.502018648), (-47.375697839, -32.802018648))
            Line((-47.375697839, -32.802018648), (-52.375697839, -32.802018648))
            ThreePointArc((-52.375697839, -32.802018648), (-55.911231744, -31.337552554), (-57.375697839, -27.802018648))
            Line((-57.375697839, -27.802018648), (-57.375697839, 2.497981352))
            ThreePointArc((-57.375697839, 2.497981352), (-55.911231744, 6.033515257), (-52.375697839, 7.497981352))
        make_face()
    extrude(amount=-BOSS_EXTRUDE2_DEPTH)

    # Sketch9 → Boss-Extrude3 (add)
    with BuildSketch(Plane.XZ.offset(-12.1)):
        with BuildLine():
            Line((19.224302161, 2.502018648), (-21.775697839, 2.502018648))
            Line((-21.775697839, 2.502018648), (-21.775697839, -0.497981352))
            Line((-21.775697839, -0.497981352), (16.224302161, -0.497981352))
            ThreePointArc((16.224302161, -0.497981352), (22.046605586, -2.367742558), (25.691645595, -7.277824785))
            ThreePointArc((25.691645595, -7.277824785), (28.245291913, -5.469789121), (29.224302161, -2.497981352))
            Line((29.224302161, -2.497981352), (29.224302161, 2.502018648))
            Line((29.224302161, 2.502018648), (19.224302161, 2.502018648))
        make_face()
    extrude(amount=BOSS_EXTRUDE3_DEPTH)

    # Sketch10 → Boss-Extrude4 (add)
    with BuildSketch(Plane.XZ):
        with BuildLine():
            Line((24.224302161, 32.802018648), (-16.775697839, 32.802018648))
            ThreePointArc((-16.775697839, 32.802018648), (-20.311231744, 31.337552554), (-21.775697839, 27.802018648))
            Line((-21.775697839, 27.802018648), (-21.775697839, -2.497981352))
            ThreePointArc((-21.775697839, -2.497981352), (-20.311231744, -6.033515257), (-16.775697839, -7.497981352))
            Line((-16.775697839, -7.497981352), (24.224302161, -7.497981352))
            ThreePointArc((24.224302161, -7.497981352), (27.759836067, -6.033515257), (29.224302161, -2.497981352))
            Line((29.224302161, -2.497981352), (29.224302161, 27.802018648))
            ThreePointArc((29.224302161, 27.802018648), (27.759836067, 31.337552554), (24.224302161, 32.802018648))
        make_face()
    extrude(amount=BOSS_EXTRUDE4_DEPTH)

    # Cut-Extrude5 outline → Cut-Extrude5 (cut)
    with BuildSketch(Plane(origin=(0, 0, 0), x_dir=(1, 0, 0), z_dir=(0, 1, 0)).offset(CUT_EXTRUDE5_START)):
        with Locations((23.424302161, -26.152018648)):
            Circle(CUT_EXTRUDE5_OUTLINE_R)
        with Locations((23.424302161, -9.152018648)):
            Circle(CUT_EXTRUDE5_OUTLINE_R)
        with Locations((-51.575697839, -9.152018648)):
            Circle(CUT_EXTRUDE5_OUTLINE_R)
        with Locations((-51.575697839, -26.152018648)):
            Circle(CUT_EXTRUDE5_OUTLINE_R)
    extrude(amount=CUT_EXTRUDE5_DEPTH, mode=Mode.SUBTRACT)

    # Cut-Extrude5 2 outline → Cut-Extrude5 2 (cut)
    with BuildSketch(Plane(origin=(0, 0, 0), x_dir=(1, 0, 0), z_dir=(0, 1, 0)).offset(CUT_EXTRUDE5_START_2)):
        with Locations((5.396574982, -17.653309847)):
            Circle(CUT_EXTRUDE5_2_OUTLINE_R)
    extrude(amount=CUT_EXTRUDE5_2_DEPTH, mode=Mode.SUBTRACT)


with BuildPart() as body_2:
    # Mirror3: mirrored copy
    add(part.part.mirror(Plane.ZX.offset(60)))


solid = Compound([part.part, body_2.part])
